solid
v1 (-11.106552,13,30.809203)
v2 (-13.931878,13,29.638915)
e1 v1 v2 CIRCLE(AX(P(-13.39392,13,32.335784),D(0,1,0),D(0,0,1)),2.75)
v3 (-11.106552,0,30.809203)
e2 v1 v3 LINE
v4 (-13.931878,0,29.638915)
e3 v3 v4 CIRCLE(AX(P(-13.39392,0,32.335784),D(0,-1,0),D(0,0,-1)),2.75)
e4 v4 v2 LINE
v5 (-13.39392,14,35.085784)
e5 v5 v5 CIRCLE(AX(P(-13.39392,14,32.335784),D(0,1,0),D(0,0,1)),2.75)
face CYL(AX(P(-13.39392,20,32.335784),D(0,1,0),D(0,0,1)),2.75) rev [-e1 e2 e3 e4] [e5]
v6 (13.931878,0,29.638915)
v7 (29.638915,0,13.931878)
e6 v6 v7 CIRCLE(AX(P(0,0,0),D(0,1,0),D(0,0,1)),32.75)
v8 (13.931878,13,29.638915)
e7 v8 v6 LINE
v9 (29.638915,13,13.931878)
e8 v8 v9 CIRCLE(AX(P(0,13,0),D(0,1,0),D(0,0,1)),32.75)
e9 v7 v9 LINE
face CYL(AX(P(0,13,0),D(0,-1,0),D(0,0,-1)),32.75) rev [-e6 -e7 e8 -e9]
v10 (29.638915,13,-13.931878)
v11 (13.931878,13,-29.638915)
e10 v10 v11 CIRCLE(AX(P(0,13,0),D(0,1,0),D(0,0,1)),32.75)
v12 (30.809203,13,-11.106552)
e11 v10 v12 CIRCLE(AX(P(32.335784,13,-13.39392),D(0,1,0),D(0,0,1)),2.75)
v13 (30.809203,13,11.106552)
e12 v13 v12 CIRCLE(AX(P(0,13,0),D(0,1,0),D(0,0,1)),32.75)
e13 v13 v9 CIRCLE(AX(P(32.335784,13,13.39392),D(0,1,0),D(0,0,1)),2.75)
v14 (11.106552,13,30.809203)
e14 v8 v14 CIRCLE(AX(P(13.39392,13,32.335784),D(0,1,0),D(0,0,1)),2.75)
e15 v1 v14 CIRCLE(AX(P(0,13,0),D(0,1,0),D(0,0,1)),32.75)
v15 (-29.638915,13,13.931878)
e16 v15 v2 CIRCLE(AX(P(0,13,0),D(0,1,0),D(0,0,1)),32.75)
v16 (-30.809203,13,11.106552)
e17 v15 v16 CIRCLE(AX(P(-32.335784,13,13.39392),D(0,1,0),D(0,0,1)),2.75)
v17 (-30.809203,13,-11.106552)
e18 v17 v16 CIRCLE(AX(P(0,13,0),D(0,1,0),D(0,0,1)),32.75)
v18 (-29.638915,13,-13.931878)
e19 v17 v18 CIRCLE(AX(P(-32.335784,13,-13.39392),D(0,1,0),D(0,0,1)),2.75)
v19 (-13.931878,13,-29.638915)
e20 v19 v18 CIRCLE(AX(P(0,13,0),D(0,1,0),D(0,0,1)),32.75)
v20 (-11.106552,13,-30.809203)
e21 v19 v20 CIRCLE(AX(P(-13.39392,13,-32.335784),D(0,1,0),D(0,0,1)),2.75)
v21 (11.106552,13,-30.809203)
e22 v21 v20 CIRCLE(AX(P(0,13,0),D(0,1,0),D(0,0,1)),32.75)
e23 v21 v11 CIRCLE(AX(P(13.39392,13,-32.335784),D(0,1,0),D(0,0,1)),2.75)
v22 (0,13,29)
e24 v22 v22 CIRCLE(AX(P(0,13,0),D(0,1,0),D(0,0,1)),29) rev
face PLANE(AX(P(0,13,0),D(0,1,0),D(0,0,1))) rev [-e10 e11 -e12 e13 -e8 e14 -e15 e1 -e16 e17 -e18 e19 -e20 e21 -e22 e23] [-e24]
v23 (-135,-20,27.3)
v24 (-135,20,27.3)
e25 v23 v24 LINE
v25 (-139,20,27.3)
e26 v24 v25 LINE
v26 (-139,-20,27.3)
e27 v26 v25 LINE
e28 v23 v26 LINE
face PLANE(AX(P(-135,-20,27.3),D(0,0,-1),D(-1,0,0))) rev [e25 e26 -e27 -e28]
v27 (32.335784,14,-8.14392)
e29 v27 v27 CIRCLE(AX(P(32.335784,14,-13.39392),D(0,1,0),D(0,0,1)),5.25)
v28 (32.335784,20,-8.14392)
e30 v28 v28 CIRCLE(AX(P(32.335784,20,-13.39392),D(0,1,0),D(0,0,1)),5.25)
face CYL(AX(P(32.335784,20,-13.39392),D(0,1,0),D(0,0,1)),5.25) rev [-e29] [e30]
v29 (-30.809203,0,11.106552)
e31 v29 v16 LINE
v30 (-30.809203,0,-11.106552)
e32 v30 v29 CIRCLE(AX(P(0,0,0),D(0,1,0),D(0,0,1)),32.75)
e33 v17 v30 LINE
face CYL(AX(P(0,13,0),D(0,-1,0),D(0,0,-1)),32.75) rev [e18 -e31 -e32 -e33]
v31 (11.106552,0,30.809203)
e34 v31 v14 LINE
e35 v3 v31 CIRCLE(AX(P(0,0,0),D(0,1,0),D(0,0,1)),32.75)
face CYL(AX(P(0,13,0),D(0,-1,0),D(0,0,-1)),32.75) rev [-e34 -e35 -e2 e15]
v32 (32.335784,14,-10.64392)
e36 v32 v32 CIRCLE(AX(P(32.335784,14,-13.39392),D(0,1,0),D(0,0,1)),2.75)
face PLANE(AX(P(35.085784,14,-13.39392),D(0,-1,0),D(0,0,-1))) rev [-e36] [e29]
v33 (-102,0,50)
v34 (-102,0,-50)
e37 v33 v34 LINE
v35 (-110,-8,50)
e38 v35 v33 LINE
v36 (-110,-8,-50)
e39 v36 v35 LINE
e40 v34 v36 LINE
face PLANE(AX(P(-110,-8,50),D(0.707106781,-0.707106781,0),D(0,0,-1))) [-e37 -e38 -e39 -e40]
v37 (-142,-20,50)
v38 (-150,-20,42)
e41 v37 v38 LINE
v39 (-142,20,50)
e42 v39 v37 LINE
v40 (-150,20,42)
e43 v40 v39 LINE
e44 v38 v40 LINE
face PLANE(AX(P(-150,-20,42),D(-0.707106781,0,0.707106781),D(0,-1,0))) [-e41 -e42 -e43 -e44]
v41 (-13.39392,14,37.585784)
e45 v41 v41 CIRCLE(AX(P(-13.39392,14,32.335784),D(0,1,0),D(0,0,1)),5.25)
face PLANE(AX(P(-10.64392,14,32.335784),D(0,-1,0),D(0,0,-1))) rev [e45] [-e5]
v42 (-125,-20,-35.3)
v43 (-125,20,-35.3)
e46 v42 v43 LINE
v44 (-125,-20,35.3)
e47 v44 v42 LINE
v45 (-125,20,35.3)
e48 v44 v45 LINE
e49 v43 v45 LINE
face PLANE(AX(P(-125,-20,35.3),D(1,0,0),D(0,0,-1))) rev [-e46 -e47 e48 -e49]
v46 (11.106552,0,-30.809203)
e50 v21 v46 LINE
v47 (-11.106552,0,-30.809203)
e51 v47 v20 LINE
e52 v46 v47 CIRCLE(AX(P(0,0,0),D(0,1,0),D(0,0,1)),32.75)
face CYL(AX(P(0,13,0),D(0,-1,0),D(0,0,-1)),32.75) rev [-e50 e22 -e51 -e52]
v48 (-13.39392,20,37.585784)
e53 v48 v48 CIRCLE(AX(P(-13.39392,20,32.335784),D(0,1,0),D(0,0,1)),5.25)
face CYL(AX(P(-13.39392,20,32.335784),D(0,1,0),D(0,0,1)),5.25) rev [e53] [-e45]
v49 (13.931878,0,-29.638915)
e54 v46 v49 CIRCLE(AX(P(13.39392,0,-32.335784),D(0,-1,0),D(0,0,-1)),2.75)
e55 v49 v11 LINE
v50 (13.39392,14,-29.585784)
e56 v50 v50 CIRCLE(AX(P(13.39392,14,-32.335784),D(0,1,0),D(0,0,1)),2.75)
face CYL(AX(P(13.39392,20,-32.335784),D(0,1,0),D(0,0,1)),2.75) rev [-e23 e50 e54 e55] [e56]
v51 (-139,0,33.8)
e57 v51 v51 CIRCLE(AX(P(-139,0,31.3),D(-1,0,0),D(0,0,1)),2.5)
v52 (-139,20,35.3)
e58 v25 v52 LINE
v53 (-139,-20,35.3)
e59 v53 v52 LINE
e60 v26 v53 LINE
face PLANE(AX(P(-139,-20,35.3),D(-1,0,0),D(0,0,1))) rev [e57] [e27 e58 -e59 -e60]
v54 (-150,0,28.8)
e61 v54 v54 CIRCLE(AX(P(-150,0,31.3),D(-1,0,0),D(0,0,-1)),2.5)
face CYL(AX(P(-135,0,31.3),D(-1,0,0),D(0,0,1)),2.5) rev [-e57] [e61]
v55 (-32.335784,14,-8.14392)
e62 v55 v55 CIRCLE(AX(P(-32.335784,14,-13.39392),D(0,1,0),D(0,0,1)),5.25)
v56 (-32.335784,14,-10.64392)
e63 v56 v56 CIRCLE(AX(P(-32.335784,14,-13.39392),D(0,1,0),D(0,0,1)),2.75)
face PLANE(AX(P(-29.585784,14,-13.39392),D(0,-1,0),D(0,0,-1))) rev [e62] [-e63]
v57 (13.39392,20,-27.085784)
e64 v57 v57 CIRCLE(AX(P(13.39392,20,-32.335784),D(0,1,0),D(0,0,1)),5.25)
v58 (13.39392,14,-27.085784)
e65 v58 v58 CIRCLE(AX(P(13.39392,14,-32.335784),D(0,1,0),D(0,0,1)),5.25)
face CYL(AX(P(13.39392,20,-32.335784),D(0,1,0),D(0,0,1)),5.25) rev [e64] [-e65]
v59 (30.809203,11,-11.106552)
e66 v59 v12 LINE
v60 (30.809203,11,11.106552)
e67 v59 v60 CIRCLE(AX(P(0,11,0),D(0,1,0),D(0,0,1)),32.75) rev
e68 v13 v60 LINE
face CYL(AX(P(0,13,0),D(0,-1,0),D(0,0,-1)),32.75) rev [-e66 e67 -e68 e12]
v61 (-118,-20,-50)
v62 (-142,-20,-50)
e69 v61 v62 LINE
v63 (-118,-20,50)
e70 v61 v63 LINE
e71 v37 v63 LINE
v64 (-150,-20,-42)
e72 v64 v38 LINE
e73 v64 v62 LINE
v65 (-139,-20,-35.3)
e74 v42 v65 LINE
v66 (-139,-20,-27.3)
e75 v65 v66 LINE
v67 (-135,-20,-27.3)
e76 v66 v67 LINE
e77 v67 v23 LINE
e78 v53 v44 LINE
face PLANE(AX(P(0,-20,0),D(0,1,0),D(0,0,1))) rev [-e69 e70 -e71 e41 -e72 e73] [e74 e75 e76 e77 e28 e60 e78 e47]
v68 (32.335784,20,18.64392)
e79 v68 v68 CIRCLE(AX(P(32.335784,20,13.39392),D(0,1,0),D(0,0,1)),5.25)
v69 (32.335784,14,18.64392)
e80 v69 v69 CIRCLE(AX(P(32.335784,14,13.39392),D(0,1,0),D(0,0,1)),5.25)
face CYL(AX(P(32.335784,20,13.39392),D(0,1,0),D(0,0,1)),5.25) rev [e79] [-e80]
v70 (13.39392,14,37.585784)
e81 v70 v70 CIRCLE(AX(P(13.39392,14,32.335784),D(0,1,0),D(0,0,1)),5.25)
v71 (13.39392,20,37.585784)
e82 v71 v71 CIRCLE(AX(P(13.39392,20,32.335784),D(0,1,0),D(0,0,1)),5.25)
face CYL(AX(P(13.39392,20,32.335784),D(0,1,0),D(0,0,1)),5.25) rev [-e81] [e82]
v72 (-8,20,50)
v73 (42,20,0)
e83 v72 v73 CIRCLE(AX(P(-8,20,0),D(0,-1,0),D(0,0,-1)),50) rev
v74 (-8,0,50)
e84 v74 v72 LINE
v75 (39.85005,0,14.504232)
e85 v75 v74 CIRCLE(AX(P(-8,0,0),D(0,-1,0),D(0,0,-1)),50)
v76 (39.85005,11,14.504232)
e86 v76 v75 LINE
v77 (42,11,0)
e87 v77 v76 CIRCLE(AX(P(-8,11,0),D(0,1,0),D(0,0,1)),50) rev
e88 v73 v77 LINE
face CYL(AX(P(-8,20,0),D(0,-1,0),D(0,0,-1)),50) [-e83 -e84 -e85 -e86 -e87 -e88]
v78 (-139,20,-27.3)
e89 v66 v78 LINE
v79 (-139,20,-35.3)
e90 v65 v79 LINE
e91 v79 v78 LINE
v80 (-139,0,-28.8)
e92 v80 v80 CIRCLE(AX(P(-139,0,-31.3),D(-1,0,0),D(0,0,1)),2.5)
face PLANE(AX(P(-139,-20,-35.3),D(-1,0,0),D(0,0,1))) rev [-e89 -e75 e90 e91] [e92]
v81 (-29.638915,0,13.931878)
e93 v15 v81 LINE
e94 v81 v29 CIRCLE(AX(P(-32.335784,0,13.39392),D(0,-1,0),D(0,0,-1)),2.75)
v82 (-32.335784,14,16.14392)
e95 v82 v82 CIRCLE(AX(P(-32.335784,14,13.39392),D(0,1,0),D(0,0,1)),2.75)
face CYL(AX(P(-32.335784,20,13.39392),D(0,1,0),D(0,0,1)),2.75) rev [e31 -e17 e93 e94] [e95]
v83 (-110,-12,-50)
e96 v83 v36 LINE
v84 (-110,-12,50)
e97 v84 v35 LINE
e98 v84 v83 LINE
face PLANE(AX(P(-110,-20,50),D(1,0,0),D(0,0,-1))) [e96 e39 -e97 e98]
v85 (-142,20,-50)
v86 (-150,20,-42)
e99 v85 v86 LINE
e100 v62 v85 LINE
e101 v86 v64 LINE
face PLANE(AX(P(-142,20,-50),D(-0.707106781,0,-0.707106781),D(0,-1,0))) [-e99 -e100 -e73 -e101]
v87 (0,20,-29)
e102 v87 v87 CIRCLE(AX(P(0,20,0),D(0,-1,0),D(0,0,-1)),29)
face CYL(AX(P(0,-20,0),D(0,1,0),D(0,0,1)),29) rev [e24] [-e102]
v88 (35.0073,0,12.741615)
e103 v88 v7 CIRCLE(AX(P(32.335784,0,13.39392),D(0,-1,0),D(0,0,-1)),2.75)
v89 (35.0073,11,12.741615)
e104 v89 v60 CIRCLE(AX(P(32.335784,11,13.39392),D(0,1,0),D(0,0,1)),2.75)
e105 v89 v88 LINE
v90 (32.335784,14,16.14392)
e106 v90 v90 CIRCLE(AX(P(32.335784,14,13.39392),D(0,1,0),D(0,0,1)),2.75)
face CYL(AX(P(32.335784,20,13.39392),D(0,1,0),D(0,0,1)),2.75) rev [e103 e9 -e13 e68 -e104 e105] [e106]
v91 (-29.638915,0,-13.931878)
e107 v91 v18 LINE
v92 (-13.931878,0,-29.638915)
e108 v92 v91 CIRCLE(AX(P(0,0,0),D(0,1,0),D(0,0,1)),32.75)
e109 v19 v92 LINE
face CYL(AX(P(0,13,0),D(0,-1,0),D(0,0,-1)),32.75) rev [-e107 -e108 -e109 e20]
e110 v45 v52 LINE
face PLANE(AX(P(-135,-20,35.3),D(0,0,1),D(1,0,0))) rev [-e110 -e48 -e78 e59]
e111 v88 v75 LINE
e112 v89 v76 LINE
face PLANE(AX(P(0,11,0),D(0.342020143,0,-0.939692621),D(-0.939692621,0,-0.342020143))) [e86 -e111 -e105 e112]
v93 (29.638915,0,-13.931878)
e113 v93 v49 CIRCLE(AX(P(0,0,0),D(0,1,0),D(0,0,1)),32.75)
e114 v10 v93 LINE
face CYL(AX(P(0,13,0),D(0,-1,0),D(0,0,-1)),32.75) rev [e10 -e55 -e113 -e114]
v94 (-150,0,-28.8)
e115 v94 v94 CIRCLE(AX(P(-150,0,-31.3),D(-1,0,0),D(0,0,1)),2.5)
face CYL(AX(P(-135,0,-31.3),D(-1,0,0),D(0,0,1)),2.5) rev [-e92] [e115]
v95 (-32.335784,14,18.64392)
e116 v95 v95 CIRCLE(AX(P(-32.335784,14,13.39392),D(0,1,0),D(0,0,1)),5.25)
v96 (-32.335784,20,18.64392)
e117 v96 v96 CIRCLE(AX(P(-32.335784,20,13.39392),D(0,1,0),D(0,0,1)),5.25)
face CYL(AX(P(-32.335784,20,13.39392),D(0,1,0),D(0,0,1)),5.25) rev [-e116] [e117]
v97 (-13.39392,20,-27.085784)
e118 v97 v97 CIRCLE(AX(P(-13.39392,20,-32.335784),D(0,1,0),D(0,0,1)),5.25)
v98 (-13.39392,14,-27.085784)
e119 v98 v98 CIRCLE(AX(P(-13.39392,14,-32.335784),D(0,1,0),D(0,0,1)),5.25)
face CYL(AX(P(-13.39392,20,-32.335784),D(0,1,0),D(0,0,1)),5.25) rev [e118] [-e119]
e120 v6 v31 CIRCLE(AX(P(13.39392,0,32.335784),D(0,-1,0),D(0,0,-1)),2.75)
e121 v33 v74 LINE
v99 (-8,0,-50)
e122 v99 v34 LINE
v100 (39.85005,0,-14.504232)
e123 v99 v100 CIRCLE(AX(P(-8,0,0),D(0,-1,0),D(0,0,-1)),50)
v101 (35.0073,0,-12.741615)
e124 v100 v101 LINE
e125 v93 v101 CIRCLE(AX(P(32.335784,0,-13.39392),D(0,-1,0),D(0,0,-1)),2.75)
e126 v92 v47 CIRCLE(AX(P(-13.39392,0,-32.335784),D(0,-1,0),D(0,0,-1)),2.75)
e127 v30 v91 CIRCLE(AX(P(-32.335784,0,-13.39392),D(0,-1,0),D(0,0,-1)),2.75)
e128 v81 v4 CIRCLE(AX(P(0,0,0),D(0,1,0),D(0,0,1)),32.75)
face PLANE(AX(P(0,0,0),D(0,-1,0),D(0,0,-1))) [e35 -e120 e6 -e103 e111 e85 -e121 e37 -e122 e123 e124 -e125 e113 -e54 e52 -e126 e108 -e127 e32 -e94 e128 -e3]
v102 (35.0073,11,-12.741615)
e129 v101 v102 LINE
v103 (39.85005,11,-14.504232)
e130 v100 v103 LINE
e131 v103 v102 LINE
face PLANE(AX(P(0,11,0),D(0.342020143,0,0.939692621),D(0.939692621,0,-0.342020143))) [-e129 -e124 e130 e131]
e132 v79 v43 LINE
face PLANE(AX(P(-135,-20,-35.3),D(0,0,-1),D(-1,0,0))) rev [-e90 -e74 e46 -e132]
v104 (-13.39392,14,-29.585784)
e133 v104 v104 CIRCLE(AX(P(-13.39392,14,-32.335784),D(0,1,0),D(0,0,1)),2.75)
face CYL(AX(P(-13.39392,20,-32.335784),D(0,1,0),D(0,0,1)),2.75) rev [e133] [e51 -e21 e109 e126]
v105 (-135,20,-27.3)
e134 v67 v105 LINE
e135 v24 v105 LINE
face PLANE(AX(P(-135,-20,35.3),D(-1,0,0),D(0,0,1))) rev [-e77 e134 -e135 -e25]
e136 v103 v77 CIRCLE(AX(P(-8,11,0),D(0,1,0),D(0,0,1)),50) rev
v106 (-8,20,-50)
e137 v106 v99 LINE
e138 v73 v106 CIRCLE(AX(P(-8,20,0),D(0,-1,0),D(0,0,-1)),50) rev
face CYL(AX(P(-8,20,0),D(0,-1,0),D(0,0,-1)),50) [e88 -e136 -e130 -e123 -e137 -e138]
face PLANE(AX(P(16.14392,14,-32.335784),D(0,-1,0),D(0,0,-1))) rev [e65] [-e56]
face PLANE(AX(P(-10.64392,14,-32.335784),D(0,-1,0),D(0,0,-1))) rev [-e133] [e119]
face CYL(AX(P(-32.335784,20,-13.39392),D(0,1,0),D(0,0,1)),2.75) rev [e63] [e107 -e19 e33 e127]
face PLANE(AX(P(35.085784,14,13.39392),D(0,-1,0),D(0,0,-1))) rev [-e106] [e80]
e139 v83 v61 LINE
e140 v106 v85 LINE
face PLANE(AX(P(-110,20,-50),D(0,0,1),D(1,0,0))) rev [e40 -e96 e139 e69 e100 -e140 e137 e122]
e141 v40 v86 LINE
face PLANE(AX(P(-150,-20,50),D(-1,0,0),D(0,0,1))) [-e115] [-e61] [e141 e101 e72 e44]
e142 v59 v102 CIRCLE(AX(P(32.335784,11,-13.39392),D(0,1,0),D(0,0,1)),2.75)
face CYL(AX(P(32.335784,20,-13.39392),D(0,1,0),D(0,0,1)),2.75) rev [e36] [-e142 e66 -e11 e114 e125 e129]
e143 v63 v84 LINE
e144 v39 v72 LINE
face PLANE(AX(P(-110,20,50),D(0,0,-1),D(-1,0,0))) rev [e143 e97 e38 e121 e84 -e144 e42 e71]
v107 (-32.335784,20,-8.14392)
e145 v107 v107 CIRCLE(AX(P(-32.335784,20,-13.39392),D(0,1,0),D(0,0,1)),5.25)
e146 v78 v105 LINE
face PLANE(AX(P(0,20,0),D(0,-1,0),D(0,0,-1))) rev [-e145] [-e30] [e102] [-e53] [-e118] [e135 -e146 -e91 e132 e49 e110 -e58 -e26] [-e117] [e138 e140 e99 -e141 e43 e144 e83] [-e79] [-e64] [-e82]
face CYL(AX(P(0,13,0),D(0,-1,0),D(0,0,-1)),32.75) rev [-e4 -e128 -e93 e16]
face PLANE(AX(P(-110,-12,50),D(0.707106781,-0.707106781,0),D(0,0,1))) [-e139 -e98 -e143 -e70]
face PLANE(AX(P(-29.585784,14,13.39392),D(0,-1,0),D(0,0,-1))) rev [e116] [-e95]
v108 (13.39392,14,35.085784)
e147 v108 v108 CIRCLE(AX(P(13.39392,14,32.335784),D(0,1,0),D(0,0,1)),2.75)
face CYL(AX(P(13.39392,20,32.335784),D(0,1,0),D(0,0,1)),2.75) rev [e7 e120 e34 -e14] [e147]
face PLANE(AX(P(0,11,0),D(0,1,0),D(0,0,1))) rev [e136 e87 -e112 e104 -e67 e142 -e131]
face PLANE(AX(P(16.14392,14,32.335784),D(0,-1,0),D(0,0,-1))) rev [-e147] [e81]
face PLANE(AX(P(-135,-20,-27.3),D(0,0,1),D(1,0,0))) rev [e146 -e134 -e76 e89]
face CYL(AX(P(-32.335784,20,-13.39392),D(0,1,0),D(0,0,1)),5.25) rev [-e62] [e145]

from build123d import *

# Parameters (mm, degrees)
SKETCH1_W                               = 152
SKETCH1_H                               = 100
BOSS_EXTRUDE1_DEPTH                     = 20
BOSS_EXTRUDE2_DEPTH                     = 20
BOSS_EXTRUDE2_DEPTH_BACK                = 20
SKETCH18_W                              = 40
SKETCH18_H                              = 100
SKETCH18_W_2                            = 10
SKETCH18_H_2                            = 70.6
CUT_EXTRUDE3_DEPTH                      = 160.373774505
CUT_EXTRUDE3_DEPTH_BACK                 = 160.373774505
SKETCH19_W                              = 4
SKETCH19_H                              = 8
SKETCH20_R                              = 2.5
CUT_EXTRUDE4_DEPTH                      = 15
CHAMFER1_SIZE                           = 8
CUT_EXTRUDE1_DEPTH                      = 164.095064303
CUT_EXTRUDE1_DEPTH_BACK                 = 164.095064303
SKETCH11_R                              = 29
CUT_EXTRUDE5_DEPTH                      = 11
SKETCH15_R                              = 32.75
CUT_EXTRUDE2_DEPTH                      = 13
CBORE_FOR_M5_HEX_HEAD_BOLT2_D           = 5.5
CBORE_FOR_M5_HEX_HEAD_BOLT2_CBORE_D     = 10.5
CBORE_FOR_M5_HEX_HEAD_BOLT2_CBORE_DEPTH = 6
FILLET1_R                               = 50


with BuildPart() as part:
    # Sketch1 → Boss-Extrude1 (new body)
    with BuildSketch(Plane(origin=(0, 0, 0), x_dir=(1, 0, 0), z_dir=(0, 1, 0))):
        with Locations((-34, 0)):
            Rectangle(SKETCH1_W, SKETCH1_H)
    extrude(amount=BOSS_EXTRUDE1_DEPTH)

    # Sketch18 → Boss-Extrude2 (add, two sides: drawn at the far end of the back side and taken through both)
    with BuildSketch(Plane(origin=(0, 0, 0), x_dir=(1, 0, 0), z_dir=(0, 1, 0)).offset(-BOSS_EXTRUDE2_DEPTH_BACK)):
        with Locations((-130, 0)):
            Rectangle(SKETCH18_W, SKETCH18_H)
        with Locations((-130, 0)):
            Rectangle(SKETCH18_W_2, SKETCH18_H_2, mode=Mode.SUBTRACT)
    extrude(amount=BOSS_EXTRUDE2_DEPTH + BOSS_EXTRUDE2_DEPTH_BACK)

    # Sketch19 → Cut-Extrude3 (cut, two sides: drawn at the far end of the back side and taken through both)
    with BuildSketch(Plane(origin=(0, 0, 0), x_dir=(1, 0, 0), z_dir=(0, 1, 0)).offset(-CUT_EXTRUDE3_DEPTH_BACK)):
        with Locations((-137, -31.3)):
            Rectangle(SKETCH19_W, SKETCH19_H)
        with Locations((-137, 31.3)):
            Rectangle(SKETCH19_W, SKETCH19_H)
    extrude(amount=CUT_EXTRUDE3_DEPTH + CUT_EXTRUDE3_DEPTH_BACK, mode=Mode.SUBTRACT)

    # Sketch20 → Cut-Extrude4 (cut)
    with BuildSketch(Plane.ZY.offset(150)):
        with Locations((-31.3, 0)):
            Circle(SKETCH20_R)
        with Locations((31.3, 0)):
            Circle(SKETCH20_R)
    extrude(amount=-CUT_EXTRUDE4_DEPTH, mode=Mode.SUBTRACT)

    # Chamfer1
    chamfer1_edges = [part.edges().sort_by_distance(p)[0] for p in [
        (-110, -20, 0),
        (-150, 0, 50),
        (-150, 0, -50),
        (-110, 0, 0),
    ]]
    chamfer(chamfer1_edges, length=CHAMFER1_SIZE)

    # Sketch11 → Cut-Extrude1 (cut, two sides: drawn at the far end of the back side and taken through both)
    with BuildSketch(Plane(origin=(0, 20, 0), x_dir=(1, 0, 0), z_dir=(0, 1, 0)).offset(-CUT_EXTRUDE1_DEPTH_BACK)):
        with Locations(Location((0, 0, 0), (0, 0, 90))):
            Circle(SKETCH11_R)
    extrude(amount=CUT_EXTRUDE1_DEPTH + CUT_EXTRUDE1_DEPTH_BACK, mode=Mode.SUBTRACT)

    # Sketch21 → Cut-Extrude5 (cut)
    with BuildSketch(Plane(origin=(0, 0, 0), x_dir=(1, 0, 0), z_dir=(0, 1, 0))):
        Polygon((0, 0), (52.866493453, -19.241830007), (52.866493453, 19.241830007), align=None)
    extrude(amount=CUT_EXTRUDE5_DEPTH, mode=Mode.SUBTRACT)

    # Sketch15 → Cut-Extrude2 (cut)
    with BuildSketch(Plane(origin=(0, 0, 0), x_dir=(1, 0, 0), z_dir=(0, 1, 0))):
        with Locations(Location((0, 0, 0), (0, 0, 20))):
            Circle(SKETCH15_R)
    extrude(amount=CUT_EXTRUDE2_DEPTH, mode=Mode.SUBTRACT)

    # CBORE for M5 Hex Head Bolt2 (through all)
    with Locations(Plane(origin=(-32.335783638, 20, -13.393920133), x_dir=(0, 0, 1), z_dir=(0, 1, 0))):
        with Locations((0, 0), (-18.941863505, 18.941863505), (-18.941863505, 45.729703771), (0, 64.671567276), (26.787840266, 64.671567276), (45.729703771, 45.729703771), (45.729703771, 18.941863505), (26.787840266, 0)):
            CounterBoreHole(CBORE_FOR_M5_HEX_HEAD_BOLT2_D / 2, CBORE_FOR_M5_HEX_HEAD_BOLT2_CBORE_D / 2, CBORE_FOR_M5_HEX_HEAD_BOLT2_CBORE_DEPTH)

    # Fillet1
    fillet1_edges = [part.edges().sort_by_distance(p)[0] for p in [
        (42, 10, -50),
        (42, 10, 50),
    ]]
    fillet(fillet1_edges, radius=FILLET1_R - 0.0001)  # a hair under: the kernel refuses the full size


solid = part.part
